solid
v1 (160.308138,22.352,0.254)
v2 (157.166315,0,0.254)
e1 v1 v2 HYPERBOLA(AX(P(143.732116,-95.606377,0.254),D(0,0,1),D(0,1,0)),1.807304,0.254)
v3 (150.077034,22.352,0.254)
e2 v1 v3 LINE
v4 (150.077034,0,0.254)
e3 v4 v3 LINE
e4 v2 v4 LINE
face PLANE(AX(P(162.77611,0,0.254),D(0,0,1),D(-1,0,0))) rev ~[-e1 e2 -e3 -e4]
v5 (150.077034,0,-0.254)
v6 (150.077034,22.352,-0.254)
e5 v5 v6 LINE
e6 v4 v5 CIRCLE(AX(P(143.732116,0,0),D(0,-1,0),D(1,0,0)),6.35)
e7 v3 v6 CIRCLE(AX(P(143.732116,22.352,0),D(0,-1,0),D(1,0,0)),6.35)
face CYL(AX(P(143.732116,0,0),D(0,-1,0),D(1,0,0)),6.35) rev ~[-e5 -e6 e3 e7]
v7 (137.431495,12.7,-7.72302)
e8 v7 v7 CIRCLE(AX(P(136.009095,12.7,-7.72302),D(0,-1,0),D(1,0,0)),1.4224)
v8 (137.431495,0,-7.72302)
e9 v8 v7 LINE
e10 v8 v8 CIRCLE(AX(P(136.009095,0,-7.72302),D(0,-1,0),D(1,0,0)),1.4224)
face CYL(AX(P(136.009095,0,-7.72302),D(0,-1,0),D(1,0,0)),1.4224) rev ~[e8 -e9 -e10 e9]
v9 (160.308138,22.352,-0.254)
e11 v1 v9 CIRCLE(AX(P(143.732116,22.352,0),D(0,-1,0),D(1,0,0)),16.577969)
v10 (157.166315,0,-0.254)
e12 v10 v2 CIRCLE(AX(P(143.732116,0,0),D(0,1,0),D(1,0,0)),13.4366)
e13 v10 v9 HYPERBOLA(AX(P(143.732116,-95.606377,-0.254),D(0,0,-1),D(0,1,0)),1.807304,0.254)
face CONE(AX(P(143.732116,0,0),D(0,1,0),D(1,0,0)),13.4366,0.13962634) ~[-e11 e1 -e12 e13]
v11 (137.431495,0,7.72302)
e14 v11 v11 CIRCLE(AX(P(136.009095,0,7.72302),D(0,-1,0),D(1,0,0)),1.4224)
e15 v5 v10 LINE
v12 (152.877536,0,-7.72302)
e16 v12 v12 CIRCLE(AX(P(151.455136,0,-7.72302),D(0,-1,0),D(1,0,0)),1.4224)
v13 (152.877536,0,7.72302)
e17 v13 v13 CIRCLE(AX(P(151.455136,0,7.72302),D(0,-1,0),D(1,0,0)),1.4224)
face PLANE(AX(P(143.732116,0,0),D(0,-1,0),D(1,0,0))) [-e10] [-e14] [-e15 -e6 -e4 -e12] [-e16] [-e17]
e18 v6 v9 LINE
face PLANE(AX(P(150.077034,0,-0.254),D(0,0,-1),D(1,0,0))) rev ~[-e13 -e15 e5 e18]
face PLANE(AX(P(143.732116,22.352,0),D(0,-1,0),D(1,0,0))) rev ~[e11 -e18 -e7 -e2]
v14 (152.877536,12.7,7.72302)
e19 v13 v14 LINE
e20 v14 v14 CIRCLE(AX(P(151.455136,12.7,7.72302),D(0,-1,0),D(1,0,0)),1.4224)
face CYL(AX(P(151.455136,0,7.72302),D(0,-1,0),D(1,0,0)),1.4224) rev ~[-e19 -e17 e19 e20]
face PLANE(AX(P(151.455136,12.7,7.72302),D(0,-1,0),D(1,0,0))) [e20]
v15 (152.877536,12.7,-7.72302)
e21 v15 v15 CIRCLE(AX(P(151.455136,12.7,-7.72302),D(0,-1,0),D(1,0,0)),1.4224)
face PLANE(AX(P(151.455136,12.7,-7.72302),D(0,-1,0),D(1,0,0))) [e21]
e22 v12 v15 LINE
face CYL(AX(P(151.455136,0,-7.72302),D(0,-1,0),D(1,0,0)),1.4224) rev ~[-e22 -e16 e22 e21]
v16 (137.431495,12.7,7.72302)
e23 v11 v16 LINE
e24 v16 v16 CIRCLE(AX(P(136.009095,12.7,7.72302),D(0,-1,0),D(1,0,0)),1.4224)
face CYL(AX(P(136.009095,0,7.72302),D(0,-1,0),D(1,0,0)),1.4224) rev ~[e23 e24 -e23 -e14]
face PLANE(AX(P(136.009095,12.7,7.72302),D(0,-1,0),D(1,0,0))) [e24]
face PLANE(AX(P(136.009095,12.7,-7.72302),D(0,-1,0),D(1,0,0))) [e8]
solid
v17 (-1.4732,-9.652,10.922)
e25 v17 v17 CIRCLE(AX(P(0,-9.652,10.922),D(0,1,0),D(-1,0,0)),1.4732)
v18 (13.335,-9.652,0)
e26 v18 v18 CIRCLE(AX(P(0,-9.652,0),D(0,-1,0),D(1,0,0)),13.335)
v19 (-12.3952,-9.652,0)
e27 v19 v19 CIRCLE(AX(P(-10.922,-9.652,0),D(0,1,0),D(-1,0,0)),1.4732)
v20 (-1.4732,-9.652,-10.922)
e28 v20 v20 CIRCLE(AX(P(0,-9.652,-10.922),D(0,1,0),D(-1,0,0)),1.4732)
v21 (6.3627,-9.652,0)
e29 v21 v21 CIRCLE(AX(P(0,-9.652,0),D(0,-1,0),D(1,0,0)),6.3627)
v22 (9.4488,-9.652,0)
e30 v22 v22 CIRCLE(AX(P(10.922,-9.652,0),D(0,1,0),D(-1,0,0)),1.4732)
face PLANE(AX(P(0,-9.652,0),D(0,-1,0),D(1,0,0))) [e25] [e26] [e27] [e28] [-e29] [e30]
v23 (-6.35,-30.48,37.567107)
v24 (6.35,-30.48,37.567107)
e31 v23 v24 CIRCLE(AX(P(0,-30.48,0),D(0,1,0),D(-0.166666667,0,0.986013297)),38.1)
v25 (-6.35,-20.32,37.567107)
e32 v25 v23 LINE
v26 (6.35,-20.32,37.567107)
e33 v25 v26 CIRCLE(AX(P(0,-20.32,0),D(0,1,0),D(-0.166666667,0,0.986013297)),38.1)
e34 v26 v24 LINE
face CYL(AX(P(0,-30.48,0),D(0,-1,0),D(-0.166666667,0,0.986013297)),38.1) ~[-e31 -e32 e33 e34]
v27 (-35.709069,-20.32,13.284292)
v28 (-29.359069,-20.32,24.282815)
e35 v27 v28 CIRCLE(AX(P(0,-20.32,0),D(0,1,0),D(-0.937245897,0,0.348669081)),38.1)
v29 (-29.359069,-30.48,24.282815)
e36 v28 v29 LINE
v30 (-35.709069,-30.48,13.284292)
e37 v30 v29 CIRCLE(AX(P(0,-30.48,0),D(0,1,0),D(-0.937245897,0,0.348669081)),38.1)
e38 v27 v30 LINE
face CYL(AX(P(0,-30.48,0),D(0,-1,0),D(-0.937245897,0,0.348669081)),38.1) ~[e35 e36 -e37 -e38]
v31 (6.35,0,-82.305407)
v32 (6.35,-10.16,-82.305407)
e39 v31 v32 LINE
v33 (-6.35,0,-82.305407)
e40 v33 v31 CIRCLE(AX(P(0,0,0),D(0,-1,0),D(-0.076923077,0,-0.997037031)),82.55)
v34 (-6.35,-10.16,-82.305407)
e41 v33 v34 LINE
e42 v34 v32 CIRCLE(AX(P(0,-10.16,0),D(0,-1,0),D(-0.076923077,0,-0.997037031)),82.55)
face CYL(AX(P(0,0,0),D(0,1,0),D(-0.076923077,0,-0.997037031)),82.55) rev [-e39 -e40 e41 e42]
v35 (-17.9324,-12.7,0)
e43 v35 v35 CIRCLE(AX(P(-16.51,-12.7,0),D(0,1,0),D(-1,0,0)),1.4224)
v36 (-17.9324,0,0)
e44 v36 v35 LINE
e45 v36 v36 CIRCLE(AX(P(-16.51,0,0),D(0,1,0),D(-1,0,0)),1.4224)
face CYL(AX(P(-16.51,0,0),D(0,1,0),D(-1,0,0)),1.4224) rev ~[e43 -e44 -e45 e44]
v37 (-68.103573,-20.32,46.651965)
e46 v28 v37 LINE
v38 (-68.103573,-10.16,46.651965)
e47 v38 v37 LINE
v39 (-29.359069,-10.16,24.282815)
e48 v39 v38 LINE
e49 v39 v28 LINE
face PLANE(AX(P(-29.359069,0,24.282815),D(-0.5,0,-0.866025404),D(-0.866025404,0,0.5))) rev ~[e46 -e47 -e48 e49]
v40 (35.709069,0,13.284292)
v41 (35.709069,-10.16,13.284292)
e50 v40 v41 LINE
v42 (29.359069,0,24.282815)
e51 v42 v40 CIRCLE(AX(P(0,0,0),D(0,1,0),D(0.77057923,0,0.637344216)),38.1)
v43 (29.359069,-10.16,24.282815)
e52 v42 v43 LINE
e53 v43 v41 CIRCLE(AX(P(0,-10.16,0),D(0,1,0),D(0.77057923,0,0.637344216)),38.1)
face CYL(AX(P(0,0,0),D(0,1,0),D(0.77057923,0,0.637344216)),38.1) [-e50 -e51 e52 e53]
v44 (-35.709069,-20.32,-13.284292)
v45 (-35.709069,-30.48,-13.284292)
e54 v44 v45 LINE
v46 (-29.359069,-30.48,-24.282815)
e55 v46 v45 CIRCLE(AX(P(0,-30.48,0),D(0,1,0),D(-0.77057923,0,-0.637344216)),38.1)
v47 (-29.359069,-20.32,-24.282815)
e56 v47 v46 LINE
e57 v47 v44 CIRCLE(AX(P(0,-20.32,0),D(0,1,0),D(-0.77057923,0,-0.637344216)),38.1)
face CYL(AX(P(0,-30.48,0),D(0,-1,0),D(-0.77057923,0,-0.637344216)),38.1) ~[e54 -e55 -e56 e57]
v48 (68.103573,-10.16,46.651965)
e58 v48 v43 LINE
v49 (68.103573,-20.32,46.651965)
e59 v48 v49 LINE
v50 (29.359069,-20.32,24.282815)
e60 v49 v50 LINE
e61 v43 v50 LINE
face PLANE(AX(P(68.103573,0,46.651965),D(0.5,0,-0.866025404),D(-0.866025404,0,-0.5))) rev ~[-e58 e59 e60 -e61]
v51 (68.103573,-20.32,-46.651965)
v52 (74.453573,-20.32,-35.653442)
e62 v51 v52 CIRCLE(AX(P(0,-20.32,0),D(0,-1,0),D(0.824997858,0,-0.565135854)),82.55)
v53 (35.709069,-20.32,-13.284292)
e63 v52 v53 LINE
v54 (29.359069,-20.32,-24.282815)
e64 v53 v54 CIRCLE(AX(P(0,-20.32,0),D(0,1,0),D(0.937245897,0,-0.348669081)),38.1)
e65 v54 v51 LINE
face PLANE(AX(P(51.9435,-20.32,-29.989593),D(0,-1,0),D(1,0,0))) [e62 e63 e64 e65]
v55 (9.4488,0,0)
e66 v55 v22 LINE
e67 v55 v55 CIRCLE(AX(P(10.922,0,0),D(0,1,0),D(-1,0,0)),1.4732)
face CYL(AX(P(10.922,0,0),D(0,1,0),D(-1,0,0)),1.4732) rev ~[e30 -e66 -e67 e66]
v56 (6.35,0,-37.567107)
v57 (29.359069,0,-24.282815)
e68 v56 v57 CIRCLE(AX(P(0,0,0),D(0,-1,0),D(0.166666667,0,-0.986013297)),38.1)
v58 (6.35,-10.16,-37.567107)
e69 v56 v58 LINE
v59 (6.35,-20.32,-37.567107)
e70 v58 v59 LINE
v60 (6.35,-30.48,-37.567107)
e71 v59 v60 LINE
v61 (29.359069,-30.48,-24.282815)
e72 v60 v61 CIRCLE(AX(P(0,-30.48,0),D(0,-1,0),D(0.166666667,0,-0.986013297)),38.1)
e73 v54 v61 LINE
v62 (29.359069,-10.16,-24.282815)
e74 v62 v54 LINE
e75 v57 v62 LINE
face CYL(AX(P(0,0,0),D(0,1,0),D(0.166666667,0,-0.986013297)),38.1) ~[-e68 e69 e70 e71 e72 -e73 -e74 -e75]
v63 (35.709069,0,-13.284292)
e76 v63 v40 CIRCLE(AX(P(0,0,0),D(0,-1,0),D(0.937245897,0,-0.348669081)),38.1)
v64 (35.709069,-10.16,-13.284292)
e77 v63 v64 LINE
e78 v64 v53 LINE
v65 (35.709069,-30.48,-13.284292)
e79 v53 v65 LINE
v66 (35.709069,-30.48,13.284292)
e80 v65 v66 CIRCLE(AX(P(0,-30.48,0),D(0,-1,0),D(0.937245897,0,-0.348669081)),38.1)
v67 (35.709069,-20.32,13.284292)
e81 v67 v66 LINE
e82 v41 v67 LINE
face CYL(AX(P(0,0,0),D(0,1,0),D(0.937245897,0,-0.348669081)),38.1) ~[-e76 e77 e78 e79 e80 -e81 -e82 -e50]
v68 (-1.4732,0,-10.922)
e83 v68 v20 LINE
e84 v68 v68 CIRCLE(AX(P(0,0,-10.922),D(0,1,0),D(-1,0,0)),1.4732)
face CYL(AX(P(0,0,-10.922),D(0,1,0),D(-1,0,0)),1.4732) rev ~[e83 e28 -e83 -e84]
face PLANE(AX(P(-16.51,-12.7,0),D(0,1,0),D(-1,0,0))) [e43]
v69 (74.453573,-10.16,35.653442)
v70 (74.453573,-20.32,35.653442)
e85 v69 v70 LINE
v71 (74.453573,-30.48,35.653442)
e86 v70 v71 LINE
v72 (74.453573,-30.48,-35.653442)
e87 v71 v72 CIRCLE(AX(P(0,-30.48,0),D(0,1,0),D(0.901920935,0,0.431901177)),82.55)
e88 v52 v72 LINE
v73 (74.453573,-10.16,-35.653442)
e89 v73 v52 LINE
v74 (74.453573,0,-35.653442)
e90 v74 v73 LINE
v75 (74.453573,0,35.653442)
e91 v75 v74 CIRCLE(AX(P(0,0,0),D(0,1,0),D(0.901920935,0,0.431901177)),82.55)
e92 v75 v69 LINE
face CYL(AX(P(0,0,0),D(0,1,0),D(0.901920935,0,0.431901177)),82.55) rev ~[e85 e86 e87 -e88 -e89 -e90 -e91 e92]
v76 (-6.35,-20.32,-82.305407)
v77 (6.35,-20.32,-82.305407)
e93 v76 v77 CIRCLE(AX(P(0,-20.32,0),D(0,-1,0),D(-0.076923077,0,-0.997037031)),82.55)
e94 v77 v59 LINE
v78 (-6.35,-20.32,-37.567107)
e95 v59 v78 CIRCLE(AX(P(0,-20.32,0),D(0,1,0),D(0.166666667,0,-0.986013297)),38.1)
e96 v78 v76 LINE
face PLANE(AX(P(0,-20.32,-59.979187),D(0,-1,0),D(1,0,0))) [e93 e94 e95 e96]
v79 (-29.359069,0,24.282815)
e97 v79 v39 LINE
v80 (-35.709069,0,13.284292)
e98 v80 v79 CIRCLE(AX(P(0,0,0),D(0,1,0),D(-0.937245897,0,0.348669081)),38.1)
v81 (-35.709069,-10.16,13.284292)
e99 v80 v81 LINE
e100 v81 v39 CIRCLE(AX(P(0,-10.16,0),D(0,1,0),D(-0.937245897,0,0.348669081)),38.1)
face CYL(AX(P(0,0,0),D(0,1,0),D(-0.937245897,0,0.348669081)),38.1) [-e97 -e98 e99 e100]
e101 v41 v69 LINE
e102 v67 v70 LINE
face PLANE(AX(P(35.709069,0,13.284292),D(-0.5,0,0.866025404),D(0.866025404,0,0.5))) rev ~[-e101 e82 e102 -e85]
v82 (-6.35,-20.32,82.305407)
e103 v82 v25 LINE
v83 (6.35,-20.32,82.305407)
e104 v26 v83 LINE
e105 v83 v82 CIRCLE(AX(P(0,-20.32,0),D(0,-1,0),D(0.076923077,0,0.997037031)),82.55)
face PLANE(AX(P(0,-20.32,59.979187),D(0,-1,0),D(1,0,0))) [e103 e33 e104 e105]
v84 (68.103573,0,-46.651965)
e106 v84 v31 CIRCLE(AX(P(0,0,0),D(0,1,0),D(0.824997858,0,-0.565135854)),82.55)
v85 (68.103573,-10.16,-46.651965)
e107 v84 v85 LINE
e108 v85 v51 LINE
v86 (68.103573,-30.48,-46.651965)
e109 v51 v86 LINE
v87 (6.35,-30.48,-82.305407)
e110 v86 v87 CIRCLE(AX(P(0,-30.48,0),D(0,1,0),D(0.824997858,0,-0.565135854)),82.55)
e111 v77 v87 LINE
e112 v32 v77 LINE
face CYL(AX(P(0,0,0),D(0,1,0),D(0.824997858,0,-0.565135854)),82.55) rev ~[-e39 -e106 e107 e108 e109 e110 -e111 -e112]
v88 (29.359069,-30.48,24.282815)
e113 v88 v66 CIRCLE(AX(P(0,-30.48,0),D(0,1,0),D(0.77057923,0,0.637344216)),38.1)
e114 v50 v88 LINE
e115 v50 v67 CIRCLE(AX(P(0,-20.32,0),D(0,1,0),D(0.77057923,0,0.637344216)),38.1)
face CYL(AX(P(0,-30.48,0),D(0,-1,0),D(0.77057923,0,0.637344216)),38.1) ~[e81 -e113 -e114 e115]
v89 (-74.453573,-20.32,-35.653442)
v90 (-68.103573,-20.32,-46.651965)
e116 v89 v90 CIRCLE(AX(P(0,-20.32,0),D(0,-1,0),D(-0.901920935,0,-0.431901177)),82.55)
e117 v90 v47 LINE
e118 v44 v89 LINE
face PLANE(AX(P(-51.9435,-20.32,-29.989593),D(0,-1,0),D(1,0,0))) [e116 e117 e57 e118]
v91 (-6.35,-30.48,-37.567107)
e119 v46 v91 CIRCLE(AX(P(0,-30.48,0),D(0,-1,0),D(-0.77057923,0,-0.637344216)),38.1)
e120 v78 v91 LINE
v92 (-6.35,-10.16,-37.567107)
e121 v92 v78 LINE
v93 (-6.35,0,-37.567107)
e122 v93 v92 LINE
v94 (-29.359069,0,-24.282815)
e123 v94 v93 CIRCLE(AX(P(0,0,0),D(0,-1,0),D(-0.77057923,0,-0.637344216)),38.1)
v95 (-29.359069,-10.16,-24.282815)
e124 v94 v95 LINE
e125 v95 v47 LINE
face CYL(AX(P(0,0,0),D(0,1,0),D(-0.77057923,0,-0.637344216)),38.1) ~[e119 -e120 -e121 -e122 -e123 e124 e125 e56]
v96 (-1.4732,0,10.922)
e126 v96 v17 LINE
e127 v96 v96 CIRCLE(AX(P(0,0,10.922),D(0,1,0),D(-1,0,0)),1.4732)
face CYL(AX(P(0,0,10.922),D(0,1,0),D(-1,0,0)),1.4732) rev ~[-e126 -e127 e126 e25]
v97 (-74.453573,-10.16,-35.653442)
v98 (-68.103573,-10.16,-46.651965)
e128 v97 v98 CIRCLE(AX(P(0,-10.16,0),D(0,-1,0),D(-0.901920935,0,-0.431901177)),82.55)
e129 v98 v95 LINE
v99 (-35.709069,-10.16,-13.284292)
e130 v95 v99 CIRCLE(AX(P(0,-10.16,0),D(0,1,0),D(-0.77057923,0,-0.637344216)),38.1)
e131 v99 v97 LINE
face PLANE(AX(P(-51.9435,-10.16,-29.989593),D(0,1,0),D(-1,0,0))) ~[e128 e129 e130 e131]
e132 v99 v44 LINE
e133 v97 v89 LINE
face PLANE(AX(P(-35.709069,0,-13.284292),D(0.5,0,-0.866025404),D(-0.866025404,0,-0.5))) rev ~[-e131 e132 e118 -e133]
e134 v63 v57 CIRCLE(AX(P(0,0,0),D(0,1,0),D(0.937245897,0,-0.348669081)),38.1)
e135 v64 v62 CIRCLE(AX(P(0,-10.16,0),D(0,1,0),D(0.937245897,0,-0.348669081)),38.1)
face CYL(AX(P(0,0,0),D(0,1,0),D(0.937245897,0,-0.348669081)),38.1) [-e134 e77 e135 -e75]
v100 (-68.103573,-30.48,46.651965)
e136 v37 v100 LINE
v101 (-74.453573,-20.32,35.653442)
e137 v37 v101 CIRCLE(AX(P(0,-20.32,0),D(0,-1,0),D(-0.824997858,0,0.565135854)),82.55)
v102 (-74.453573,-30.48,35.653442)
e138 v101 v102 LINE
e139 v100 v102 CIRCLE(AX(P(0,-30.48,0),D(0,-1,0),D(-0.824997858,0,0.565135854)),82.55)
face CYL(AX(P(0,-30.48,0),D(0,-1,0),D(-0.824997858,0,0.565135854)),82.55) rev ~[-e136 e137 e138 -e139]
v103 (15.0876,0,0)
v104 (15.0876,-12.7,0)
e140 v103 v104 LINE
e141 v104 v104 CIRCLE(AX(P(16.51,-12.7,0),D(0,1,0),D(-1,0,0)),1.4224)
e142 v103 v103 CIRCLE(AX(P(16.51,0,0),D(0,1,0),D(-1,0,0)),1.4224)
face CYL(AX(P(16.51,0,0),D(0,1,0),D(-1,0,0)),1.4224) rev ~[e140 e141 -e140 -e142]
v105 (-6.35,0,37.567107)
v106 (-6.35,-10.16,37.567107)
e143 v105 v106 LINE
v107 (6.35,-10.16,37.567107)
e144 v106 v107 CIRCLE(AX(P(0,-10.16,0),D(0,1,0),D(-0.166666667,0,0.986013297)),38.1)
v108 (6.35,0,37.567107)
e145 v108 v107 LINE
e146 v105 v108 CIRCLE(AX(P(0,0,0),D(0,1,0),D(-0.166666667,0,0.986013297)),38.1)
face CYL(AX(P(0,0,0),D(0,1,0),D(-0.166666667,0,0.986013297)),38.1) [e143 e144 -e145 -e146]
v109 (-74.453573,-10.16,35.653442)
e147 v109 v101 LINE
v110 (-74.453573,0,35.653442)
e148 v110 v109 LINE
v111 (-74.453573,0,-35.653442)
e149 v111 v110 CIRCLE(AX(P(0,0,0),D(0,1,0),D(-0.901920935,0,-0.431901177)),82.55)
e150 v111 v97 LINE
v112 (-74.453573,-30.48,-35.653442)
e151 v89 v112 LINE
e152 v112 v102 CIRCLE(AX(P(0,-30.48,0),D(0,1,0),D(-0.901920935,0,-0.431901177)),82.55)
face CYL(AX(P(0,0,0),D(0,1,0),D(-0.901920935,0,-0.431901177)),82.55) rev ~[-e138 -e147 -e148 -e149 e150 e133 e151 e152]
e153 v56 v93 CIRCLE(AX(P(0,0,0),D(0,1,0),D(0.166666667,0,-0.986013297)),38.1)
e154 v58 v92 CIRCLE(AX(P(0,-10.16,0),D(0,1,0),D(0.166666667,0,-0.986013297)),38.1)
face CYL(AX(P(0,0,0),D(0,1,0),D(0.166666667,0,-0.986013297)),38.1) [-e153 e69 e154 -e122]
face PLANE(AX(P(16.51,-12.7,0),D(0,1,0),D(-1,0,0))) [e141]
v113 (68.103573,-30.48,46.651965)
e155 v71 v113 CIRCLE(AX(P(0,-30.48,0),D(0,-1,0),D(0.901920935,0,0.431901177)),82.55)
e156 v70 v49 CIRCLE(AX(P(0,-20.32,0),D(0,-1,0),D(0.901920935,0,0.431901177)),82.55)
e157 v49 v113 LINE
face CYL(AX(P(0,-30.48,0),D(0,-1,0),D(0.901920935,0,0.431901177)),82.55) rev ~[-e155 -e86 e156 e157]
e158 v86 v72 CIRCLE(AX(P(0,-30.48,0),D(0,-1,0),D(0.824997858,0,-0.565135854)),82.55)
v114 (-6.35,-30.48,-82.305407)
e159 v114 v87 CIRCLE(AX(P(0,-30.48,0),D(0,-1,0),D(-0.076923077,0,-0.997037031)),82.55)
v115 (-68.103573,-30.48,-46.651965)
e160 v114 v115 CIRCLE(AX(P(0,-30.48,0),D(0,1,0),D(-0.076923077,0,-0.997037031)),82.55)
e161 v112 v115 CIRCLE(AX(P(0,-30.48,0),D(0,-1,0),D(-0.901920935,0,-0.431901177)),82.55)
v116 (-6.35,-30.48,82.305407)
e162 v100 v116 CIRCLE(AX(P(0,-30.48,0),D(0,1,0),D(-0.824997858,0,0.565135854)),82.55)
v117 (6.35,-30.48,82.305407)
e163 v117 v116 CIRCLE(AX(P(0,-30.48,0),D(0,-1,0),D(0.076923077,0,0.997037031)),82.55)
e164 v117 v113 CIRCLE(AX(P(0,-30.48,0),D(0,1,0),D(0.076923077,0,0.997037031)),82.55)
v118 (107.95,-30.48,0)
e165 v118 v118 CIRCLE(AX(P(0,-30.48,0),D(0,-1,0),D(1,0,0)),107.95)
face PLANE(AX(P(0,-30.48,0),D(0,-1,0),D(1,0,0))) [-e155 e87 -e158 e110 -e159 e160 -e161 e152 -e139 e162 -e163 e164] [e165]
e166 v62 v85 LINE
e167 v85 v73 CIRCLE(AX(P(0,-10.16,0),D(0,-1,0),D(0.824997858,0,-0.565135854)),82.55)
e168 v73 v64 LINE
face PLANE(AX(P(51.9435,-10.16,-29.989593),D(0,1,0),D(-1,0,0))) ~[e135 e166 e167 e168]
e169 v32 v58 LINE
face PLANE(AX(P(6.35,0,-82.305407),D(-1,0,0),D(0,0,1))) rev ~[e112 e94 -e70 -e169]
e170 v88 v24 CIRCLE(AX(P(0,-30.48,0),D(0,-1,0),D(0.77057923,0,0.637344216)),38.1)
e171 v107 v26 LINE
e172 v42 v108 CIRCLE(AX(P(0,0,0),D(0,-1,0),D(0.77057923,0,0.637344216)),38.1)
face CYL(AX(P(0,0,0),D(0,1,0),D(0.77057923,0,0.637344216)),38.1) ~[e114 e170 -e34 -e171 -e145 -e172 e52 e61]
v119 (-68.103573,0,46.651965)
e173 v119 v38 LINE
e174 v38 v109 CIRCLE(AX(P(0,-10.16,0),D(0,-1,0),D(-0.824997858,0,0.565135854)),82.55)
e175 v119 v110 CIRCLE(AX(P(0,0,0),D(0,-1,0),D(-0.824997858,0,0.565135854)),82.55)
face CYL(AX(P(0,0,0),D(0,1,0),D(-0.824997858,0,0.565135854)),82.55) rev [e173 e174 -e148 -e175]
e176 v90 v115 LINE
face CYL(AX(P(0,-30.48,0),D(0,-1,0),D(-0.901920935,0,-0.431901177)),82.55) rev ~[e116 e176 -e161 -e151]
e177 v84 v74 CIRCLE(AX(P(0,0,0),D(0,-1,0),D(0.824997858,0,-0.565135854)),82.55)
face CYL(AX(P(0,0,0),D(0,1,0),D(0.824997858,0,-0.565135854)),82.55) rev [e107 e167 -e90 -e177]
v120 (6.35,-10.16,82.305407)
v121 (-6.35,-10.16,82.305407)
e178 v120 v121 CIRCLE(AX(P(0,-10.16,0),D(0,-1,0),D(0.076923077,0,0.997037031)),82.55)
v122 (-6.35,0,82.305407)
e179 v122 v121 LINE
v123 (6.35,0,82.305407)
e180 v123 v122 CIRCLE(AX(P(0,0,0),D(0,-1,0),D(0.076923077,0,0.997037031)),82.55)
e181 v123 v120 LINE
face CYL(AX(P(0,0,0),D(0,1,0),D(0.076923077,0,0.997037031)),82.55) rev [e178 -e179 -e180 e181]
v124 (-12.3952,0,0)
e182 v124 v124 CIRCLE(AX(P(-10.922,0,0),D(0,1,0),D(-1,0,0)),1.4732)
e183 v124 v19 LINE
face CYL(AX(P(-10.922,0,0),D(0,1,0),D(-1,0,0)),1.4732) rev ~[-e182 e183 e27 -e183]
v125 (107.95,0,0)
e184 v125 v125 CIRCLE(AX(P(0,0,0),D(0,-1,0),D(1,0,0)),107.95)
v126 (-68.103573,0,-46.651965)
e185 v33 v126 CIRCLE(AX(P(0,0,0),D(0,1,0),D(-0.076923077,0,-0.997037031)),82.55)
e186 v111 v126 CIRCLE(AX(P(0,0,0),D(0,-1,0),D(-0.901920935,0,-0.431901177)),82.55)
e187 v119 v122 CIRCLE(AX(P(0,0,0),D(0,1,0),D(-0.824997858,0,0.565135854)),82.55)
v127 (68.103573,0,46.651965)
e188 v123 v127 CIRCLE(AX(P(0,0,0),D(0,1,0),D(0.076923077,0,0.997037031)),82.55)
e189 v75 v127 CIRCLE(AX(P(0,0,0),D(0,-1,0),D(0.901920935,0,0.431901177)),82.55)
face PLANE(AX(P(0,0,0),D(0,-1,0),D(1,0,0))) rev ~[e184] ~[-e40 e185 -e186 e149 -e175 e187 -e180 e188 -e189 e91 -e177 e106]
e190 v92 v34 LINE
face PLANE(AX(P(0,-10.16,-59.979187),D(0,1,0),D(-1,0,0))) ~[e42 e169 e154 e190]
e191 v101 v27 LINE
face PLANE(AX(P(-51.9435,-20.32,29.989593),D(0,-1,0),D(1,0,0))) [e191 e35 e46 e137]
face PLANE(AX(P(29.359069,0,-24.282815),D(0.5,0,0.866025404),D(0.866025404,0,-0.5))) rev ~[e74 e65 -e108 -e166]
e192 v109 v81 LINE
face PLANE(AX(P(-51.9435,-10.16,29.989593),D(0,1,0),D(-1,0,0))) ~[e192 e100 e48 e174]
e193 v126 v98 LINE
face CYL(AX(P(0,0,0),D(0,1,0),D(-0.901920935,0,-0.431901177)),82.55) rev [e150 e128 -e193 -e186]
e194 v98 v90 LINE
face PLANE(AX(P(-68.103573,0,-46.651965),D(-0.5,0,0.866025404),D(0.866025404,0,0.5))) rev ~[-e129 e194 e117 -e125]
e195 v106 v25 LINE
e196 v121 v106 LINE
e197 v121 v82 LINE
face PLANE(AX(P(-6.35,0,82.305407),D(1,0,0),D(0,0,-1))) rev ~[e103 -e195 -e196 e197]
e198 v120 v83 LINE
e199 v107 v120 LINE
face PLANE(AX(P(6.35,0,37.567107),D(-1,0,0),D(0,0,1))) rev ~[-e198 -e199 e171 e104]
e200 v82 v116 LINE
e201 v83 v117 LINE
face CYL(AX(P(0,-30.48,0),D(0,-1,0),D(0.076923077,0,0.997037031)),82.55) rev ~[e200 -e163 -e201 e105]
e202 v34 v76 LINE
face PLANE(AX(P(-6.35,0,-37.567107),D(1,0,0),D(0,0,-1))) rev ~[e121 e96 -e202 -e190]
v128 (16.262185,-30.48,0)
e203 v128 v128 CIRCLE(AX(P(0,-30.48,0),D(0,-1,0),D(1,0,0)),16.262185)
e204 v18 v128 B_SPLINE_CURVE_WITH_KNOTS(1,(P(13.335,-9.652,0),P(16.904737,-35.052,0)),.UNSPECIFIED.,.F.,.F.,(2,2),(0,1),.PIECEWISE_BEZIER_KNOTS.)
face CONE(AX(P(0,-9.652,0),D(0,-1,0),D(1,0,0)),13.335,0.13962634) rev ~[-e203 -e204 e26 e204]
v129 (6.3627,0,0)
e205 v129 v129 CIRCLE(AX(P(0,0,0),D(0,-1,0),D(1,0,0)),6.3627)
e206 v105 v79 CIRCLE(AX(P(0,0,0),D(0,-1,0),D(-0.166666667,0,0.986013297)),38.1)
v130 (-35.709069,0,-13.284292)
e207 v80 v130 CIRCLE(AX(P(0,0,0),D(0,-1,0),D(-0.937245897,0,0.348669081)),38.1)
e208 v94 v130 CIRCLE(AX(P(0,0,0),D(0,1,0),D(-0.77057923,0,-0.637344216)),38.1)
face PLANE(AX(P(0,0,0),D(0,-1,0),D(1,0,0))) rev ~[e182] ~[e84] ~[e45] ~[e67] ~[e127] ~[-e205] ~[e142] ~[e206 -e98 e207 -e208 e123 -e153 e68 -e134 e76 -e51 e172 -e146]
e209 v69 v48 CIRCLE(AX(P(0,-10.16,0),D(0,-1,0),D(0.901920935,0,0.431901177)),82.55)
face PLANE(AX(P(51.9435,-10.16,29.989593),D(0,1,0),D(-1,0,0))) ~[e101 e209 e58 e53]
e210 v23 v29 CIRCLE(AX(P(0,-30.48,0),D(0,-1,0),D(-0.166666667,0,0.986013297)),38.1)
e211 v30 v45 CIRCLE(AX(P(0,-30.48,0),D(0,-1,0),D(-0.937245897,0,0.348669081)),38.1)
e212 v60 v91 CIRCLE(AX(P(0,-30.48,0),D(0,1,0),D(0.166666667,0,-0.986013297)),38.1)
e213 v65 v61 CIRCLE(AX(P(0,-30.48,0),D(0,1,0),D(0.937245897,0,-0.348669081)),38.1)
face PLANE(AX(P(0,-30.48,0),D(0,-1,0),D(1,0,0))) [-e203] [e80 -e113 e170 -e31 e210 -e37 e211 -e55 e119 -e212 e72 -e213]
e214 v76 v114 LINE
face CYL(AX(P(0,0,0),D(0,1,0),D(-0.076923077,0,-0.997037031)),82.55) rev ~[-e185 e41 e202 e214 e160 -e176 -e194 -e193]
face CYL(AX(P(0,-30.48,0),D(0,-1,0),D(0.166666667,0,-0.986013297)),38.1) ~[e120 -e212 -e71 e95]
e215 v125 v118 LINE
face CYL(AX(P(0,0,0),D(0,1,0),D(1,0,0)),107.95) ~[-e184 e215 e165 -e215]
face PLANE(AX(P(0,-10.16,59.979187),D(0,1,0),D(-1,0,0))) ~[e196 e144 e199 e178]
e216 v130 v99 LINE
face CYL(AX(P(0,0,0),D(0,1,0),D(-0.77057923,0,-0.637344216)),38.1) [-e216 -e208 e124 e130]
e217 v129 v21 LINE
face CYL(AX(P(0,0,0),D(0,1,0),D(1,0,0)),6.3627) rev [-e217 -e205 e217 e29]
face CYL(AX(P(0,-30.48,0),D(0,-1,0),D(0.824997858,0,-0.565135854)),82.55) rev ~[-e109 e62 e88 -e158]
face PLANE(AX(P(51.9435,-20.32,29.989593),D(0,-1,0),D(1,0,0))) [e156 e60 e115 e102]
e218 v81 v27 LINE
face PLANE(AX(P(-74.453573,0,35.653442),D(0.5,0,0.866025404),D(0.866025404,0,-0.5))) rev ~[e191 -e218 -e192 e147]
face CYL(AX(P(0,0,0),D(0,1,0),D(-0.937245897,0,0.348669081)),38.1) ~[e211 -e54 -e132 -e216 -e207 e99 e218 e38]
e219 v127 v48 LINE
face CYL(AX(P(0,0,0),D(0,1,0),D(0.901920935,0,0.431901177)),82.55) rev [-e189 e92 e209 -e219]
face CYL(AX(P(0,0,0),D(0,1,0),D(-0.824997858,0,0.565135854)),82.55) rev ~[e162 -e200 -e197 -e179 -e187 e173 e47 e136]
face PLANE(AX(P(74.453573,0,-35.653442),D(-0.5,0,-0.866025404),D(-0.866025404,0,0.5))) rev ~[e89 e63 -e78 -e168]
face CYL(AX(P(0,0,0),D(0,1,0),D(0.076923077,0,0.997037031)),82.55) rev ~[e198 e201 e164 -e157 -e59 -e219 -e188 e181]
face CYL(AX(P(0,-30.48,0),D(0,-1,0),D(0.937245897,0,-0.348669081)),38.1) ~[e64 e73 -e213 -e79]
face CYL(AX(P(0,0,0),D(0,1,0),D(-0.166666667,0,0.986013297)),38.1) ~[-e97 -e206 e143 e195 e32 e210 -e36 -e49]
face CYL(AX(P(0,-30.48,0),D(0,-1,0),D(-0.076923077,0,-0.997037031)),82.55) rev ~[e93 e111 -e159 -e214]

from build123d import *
from build123d import SkipClean  # not in build123d's __all__

# Parameters (mm, degrees)
F0_R        = 107.95
F0_R_2      = 104.775
F0_R_3      = 35.56
F0_R_4      = 6.3627
F1_DEPTH    = 30.48
F3_DEPTH    = 10.16
F6_R        = 13.335
F6_R_2      = 6.3627
F7_DEPTH    = 20.828
F7_FACE_R   = 13.335
F7_FACE_R_2 = 6.3627
F8_DEPTH    = 25.4
F8_TAPER    = -8
F9_R        = 1.4732
F10_DEPTH   = 25.4
F11_R       = 1.4224
F12_DEPTH   = 12.7
F13_R       = 13.4366
F13_R_2     = 1.4224
F13_R_3     = 6.35
F14_DEPTH   = 22.352
F14_TAPER   = -8
F15_DEPTH   = 12.7
F16_DEPTH   = 25.4
F18_DEPTH   = 25.4


# Not quite as in the source:
# - after a boolean that leaves OpenCascade's solid faulty, fix() repairs it
# - a feature of the source that left no trace in its solid (it failed there, or was rolled back) is left out
# - a pattern or mirror of a feature is missing from the dataset's text; its kind, count and spacing are read off the source's solid


with BuildPart() as f1:
    # F0 (on Front) → F1 (new body)
    with BuildSketch(Plane.XZ):
        Circle(F0_R)
        Circle(F0_R_2, mode=Mode.SUBTRACT)
        Circle(F0_R_2)
        with BuildLine():
            Line((-68.103573218, -46.6519647489), (-29.3590686819, -24.2828146254))
            ThreePointArc((-29.3590686819, -24.2828146254), (-19.05, -32.9955678842), (-6.35, -37.5671066227))
            Line((-6.35, -37.5671066227), (-6.35, -82.3054068698))
            ThreePointArc((-6.35, -82.3054068698), (-41.275, -71.4903970824), (-68.103573218, -46.6519647489))
        make_face(mode=Mode.SUBTRACT)
        with BuildLine():
            Line((6.35, -82.3054068698), (6.35, -37.5671066227))
            ThreePointArc((6.35, -37.5671066227), (19.05, -32.9955678842), (29.3590686819, -24.2828146254))
            Line((29.3590686819, -24.2828146254), (68.103573218, -46.6519647489))
            ThreePointArc((68.103573218, -46.6519647489), (41.275, -71.4903970824), (6.35, -82.3054068698))
        make_face(mode=Mode.SUBTRACT)
        with BuildLine():
            Line((74.453573218, -35.6534421209), (35.7090686819, -13.2842919973))
            ThreePointArc((35.7090686819, -13.2842919973), (38.1, 0), (35.7090686819, 13.2842919973))
            Line((35.7090686819, 13.2842919973), (74.453573218, 35.6534421209))
            ThreePointArc((74.453573218, 35.6534421209), (82.55, 0), (74.453573218, -35.6534421209))
        make_face(mode=Mode.SUBTRACT)
        with BuildLine():
            ThreePointArc((-74.453573218, -35.6534421209), (-82.55, 0), (-74.453573218, 35.6534421209))
            Line((-74.453573218, 35.6534421209), (-35.7090686819, 13.2842919973))
            ThreePointArc((-35.7090686819, 13.2842919973), (-38.1, 0), (-35.7090686819, -13.2842919973))
            Line((-35.7090686819, -13.2842919973), (-74.453573218, -35.6534421209))
        make_face(mode=Mode.SUBTRACT)
        with BuildLine():
            Line((-6.35, 82.3054068698), (-6.35, 65.1078820229))
            Line((-6.35, 65.1078820229), (-6.35, 37.5671066227))
            ThreePointArc((-6.35, 37.5671066227), (-19.05, 32.9955678842), (-29.3590686819, 24.2828146254))
            Line((-29.3590686819, 24.2828146254), (-68.103573218, 46.6519647489))
            ThreePointArc((-68.103573218, 46.6519647489), (-41.275, 71.4903970824), (-6.35, 82.3054068698))
        make_face(mode=Mode.SUBTRACT)
        Circle(F0_R_3, mode=Mode.SUBTRACT)
        with BuildLine():
            Line((6.35, 37.5671066227), (6.35, 65.1078820229))
            Line((6.35, 65.1078820229), (6.35, 82.3054068698))
            ThreePointArc((6.35, 82.3054068698), (41.275, 71.4903970824), (68.103573218, 46.6519647489))
            Line((68.103573218, 46.6519647489), (29.3590686819, 24.2828146254))
            ThreePointArc((29.3590686819, 24.2828146254), (19.05, 32.9955678842), (6.35, 37.5671066227))
        make_face(mode=Mode.SUBTRACT)
        Circle(F0_R_3)
        Circle(F0_R_4, mode=Mode.SUBTRACT)
    extrude(amount=F1_DEPTH)

    # F2 (on face) → F3 (cut)
    with BuildSketch(Plane.XZ.offset(30.48)):
        with BuildLine():
            ThreePointArc((-74.453573218, -35.6534421209), (-71.4903970824, -41.275), (-68.103573218, -46.6519647489))
            Line((-68.103573218, -46.6519647489), (-29.3590686819, -24.2828146254))
            ThreePointArc((-29.3590686819, -24.2828146254), (-32.9955678842, -19.05), (-35.7090686819, -13.2842919973))
            Line((-35.7090686819, -13.2842919973), (-74.453573218, -35.6534421209))
        make_face()
        with BuildLine():
            ThreePointArc((-6.35, -82.3054068698), (0, -82.55), (6.35, -82.3054068698))
            Line((6.35, -82.3054068698), (6.35, -37.5671066227))
            ThreePointArc((6.35, -37.5671066227), (0, -38.1), (-6.35, -37.5671066227))
            Line((-6.35, -37.5671066227), (-6.35, -82.3054068698))
        make_face()
        with BuildLine():
            ThreePointArc((68.103573218, -46.6519647489), (71.4903970824, -41.275), (74.453573218, -35.6534421209))
            Line((74.453573218, -35.6534421209), (35.7090686819, -13.2842919973))
            ThreePointArc((35.7090686819, -13.2842919973), (32.9955678842, -19.05), (29.3590686819, -24.2828146254))
            Line((29.3590686819, -24.2828146254), (68.103573218, -46.6519647489))
        make_face()
        with BuildLine():
            Line((35.7090686819, 13.2842919973), (74.453573218, 35.6534421209))
            ThreePointArc((74.453573218, 35.6534421209), (71.4903970824, 41.275), (68.103573218, 46.6519647489))
            Line((68.103573218, 46.6519647489), (29.3590686819, 24.2828146254))
            ThreePointArc((29.3590686819, 24.2828146254), (32.9955678842, 19.05), (35.7090686819, 13.2842919973))
        make_face()
        with BuildLine():
            Line((6.35, 37.5671066227), (6.35, 82.3054068698))
            ThreePointArc((6.35, 82.3054068698), (0, 82.55), (-6.35, 82.3054068698))
            Line((-6.35, 82.3054068698), (-6.35, 37.5671066227))
            ThreePointArc((-6.35, 37.5671066227), (0, 38.1), (6.35, 37.5671066227))
        make_face()
        with BuildLine():
            Line((-29.3590686819, 24.2828146254), (-68.103573218, 46.6519647489))
            ThreePointArc((-68.103573218, 46.6519647489), (-71.4903970824, 41.275), (-74.453573218, 35.6534421209))
            Line((-74.453573218, 35.6534421209), (-35.7090686819, 13.2842919973))
            ThreePointArc((-35.7090686819, 13.2842919973), (-32.9955678842, 19.05), (-29.3590686819, 24.2828146254))
        make_face()
    with SkipClean():  # cleaning this boolean's faces spoils the solid; the shape is the same uncleaned
        f3 = extrude(amount=-F3_DEPTH, mode=Mode.SUBTRACT)

    # F3_copies: F3 across plane
    with SkipClean():  # cleaning this boolean's faces spoils the solid; the shape is the same uncleaned
        add(f3.mirror(Plane.ZX.offset(-15.24)), clean=False, mode=Mode.SUBTRACT)

    # F6 (on face) → F7 (cut)
    with BuildSketch(Plane.XZ.offset(30.48)):
        Circle(F6_R)
        Circle(F6_R_2, mode=Mode.SUBTRACT)
    extrude(amount=-F7_DEPTH, mode=Mode.SUBTRACT)

    add(f1.part.fix(), mode=Mode.REPLACE)

    # F7_face (on face) → F8 (cut)
    with BuildSketch(Plane.XZ.offset(9.652)):
        Circle(F7_FACE_R)
        Circle(F7_FACE_R_2, mode=Mode.SUBTRACT)
    extrude(amount=F8_DEPTH, taper=F8_TAPER, mode=Mode.SUBTRACT)

    # F9 (on face) → F10 (cut)
    with BuildSketch(Plane(origin=(0, 0, 0), x_dir=(-1, 0, 0), z_dir=(0, 1, 0))):
        with Locations((-10.922, 0)):
            Circle(F9_R)
        with Locations((0, 10.922)):
            Circle(F9_R)
        with Locations((0, -10.922)):
            Circle(F9_R)
        with Locations((10.922, 0)):
            Circle(F9_R)
    extrude(amount=-F10_DEPTH, mode=Mode.SUBTRACT)

    # F11 (on face) → F12 (cut)
    with BuildSketch(Plane(origin=(0, 0, 0), x_dir=(-1, 0, 0), z_dir=(0, 1, 0))):
        with Locations((-16.51, 0)):
            Circle(F11_R)
        with Locations((16.51, 0)):
            Circle(F11_R)
    extrude(amount=-F12_DEPTH, mode=Mode.SUBTRACT)


with BuildPart() as f14:
    # F13 (on Front) → F14 (new body)
    with BuildSketch(Plane.XZ):
        with Locations((143.7321156263, 0)):
            Circle(F13_R)
        with Locations((136.0090953622, -7.7230202641)):
            Circle(F13_R_2, mode=Mode.SUBTRACT)
        with Locations((143.7321156263, 0)):
            Circle(F13_R_3, mode=Mode.SUBTRACT)
        with Locations((151.4551358905, -7.7230202641)):
            Circle(F13_R_2, mode=Mode.SUBTRACT)
        with Locations((136.0090953622, 7.7230202641)):
            Circle(F13_R_2, mode=Mode.SUBTRACT)
        with Locations((151.4551358905, 7.7230202641)):
            Circle(F13_R_2, mode=Mode.SUBTRACT)
        with Locations((136.0090953622, 7.7230202641)):
            Circle(F13_R_2)
        with Locations((136.0090953622, -7.7230202641)):
            Circle(F13_R_2)
        with Locations((151.4551358905, -7.7230202641)):
            Circle(F13_R_2)
        with Locations((151.4551358905, 7.7230202641)):
            Circle(F13_R_2)
        with Locations((143.7321156263, 0)):
            Circle(F13_R_3)
    extrude(amount=-F14_DEPTH, taper=F14_TAPER)

    # F13 (on Front) → F15 (cut)
    with BuildSketch(Plane.XZ):
        with Locations((136.0090953622, 7.7230202641)):
            Circle(F13_R_2)
        with Locations((151.4551358905, 7.7230202641)):
            Circle(F13_R_2)
        with Locations((151.4551358905, -7.7230202641)):
            Circle(F13_R_2)
        with Locations((136.0090953622, -7.7230202641)):
            Circle(F13_R_2)
    extrude(amount=-F15_DEPTH, mode=Mode.SUBTRACT)

    # F13 (on Front) → F16 (cut)
    with BuildSketch(Plane.XZ):
        with Locations((143.7321156263, 0)):
            Circle(F13_R_3)
    extrude(amount=-F16_DEPTH, mode=Mode.SUBTRACT)

    # F17 (on face) → F18 (cut)
    with BuildSketch(Plane.XZ):
        with BuildLine():
            ThreePointArc((157.1687156263, 0), (157.1681153703, 0.1270056738), (157.1663146557, 0.254))
            Line((157.1663146557, 0.254), (150.0770335927, 0.254))
            ThreePointArc((150.0770335927, 0.254), (150.0808449908, 0.1270254178), (150.0821156263, 0))
            ThreePointArc((150.0821156263, 0), (150.0808449908, -0.1270254178), (150.0770335927, -0.254))
            Line((150.0770335927, -0.254), (157.1663146557, -0.254))
            ThreePointArc((157.1663146557, -0.254), (157.1681153703, -0.1270056738), (157.1687156263, 0))
        make_face()
        with BuildLine():
            Line((162.7761095905, -0.254), (162.7761095905, 0.254))
            Line((162.7761095905, 0.254), (157.1663146557, 0.254))
            ThreePointArc((157.1663146557, 0.254), (157.1681153703, 0.1270056738), (157.1687156263, 0))
            ThreePointArc((157.1687156263, 0), (157.1681153703, -0.1270056738), (157.1663146557, -0.254))
            Line((157.1663146557, -0.254), (162.7761095905, -0.254))
        make_face()
    extrude(amount=-F18_DEPTH, mode=Mode.SUBTRACT)


solid = Compound([f1.part, f14.part])
